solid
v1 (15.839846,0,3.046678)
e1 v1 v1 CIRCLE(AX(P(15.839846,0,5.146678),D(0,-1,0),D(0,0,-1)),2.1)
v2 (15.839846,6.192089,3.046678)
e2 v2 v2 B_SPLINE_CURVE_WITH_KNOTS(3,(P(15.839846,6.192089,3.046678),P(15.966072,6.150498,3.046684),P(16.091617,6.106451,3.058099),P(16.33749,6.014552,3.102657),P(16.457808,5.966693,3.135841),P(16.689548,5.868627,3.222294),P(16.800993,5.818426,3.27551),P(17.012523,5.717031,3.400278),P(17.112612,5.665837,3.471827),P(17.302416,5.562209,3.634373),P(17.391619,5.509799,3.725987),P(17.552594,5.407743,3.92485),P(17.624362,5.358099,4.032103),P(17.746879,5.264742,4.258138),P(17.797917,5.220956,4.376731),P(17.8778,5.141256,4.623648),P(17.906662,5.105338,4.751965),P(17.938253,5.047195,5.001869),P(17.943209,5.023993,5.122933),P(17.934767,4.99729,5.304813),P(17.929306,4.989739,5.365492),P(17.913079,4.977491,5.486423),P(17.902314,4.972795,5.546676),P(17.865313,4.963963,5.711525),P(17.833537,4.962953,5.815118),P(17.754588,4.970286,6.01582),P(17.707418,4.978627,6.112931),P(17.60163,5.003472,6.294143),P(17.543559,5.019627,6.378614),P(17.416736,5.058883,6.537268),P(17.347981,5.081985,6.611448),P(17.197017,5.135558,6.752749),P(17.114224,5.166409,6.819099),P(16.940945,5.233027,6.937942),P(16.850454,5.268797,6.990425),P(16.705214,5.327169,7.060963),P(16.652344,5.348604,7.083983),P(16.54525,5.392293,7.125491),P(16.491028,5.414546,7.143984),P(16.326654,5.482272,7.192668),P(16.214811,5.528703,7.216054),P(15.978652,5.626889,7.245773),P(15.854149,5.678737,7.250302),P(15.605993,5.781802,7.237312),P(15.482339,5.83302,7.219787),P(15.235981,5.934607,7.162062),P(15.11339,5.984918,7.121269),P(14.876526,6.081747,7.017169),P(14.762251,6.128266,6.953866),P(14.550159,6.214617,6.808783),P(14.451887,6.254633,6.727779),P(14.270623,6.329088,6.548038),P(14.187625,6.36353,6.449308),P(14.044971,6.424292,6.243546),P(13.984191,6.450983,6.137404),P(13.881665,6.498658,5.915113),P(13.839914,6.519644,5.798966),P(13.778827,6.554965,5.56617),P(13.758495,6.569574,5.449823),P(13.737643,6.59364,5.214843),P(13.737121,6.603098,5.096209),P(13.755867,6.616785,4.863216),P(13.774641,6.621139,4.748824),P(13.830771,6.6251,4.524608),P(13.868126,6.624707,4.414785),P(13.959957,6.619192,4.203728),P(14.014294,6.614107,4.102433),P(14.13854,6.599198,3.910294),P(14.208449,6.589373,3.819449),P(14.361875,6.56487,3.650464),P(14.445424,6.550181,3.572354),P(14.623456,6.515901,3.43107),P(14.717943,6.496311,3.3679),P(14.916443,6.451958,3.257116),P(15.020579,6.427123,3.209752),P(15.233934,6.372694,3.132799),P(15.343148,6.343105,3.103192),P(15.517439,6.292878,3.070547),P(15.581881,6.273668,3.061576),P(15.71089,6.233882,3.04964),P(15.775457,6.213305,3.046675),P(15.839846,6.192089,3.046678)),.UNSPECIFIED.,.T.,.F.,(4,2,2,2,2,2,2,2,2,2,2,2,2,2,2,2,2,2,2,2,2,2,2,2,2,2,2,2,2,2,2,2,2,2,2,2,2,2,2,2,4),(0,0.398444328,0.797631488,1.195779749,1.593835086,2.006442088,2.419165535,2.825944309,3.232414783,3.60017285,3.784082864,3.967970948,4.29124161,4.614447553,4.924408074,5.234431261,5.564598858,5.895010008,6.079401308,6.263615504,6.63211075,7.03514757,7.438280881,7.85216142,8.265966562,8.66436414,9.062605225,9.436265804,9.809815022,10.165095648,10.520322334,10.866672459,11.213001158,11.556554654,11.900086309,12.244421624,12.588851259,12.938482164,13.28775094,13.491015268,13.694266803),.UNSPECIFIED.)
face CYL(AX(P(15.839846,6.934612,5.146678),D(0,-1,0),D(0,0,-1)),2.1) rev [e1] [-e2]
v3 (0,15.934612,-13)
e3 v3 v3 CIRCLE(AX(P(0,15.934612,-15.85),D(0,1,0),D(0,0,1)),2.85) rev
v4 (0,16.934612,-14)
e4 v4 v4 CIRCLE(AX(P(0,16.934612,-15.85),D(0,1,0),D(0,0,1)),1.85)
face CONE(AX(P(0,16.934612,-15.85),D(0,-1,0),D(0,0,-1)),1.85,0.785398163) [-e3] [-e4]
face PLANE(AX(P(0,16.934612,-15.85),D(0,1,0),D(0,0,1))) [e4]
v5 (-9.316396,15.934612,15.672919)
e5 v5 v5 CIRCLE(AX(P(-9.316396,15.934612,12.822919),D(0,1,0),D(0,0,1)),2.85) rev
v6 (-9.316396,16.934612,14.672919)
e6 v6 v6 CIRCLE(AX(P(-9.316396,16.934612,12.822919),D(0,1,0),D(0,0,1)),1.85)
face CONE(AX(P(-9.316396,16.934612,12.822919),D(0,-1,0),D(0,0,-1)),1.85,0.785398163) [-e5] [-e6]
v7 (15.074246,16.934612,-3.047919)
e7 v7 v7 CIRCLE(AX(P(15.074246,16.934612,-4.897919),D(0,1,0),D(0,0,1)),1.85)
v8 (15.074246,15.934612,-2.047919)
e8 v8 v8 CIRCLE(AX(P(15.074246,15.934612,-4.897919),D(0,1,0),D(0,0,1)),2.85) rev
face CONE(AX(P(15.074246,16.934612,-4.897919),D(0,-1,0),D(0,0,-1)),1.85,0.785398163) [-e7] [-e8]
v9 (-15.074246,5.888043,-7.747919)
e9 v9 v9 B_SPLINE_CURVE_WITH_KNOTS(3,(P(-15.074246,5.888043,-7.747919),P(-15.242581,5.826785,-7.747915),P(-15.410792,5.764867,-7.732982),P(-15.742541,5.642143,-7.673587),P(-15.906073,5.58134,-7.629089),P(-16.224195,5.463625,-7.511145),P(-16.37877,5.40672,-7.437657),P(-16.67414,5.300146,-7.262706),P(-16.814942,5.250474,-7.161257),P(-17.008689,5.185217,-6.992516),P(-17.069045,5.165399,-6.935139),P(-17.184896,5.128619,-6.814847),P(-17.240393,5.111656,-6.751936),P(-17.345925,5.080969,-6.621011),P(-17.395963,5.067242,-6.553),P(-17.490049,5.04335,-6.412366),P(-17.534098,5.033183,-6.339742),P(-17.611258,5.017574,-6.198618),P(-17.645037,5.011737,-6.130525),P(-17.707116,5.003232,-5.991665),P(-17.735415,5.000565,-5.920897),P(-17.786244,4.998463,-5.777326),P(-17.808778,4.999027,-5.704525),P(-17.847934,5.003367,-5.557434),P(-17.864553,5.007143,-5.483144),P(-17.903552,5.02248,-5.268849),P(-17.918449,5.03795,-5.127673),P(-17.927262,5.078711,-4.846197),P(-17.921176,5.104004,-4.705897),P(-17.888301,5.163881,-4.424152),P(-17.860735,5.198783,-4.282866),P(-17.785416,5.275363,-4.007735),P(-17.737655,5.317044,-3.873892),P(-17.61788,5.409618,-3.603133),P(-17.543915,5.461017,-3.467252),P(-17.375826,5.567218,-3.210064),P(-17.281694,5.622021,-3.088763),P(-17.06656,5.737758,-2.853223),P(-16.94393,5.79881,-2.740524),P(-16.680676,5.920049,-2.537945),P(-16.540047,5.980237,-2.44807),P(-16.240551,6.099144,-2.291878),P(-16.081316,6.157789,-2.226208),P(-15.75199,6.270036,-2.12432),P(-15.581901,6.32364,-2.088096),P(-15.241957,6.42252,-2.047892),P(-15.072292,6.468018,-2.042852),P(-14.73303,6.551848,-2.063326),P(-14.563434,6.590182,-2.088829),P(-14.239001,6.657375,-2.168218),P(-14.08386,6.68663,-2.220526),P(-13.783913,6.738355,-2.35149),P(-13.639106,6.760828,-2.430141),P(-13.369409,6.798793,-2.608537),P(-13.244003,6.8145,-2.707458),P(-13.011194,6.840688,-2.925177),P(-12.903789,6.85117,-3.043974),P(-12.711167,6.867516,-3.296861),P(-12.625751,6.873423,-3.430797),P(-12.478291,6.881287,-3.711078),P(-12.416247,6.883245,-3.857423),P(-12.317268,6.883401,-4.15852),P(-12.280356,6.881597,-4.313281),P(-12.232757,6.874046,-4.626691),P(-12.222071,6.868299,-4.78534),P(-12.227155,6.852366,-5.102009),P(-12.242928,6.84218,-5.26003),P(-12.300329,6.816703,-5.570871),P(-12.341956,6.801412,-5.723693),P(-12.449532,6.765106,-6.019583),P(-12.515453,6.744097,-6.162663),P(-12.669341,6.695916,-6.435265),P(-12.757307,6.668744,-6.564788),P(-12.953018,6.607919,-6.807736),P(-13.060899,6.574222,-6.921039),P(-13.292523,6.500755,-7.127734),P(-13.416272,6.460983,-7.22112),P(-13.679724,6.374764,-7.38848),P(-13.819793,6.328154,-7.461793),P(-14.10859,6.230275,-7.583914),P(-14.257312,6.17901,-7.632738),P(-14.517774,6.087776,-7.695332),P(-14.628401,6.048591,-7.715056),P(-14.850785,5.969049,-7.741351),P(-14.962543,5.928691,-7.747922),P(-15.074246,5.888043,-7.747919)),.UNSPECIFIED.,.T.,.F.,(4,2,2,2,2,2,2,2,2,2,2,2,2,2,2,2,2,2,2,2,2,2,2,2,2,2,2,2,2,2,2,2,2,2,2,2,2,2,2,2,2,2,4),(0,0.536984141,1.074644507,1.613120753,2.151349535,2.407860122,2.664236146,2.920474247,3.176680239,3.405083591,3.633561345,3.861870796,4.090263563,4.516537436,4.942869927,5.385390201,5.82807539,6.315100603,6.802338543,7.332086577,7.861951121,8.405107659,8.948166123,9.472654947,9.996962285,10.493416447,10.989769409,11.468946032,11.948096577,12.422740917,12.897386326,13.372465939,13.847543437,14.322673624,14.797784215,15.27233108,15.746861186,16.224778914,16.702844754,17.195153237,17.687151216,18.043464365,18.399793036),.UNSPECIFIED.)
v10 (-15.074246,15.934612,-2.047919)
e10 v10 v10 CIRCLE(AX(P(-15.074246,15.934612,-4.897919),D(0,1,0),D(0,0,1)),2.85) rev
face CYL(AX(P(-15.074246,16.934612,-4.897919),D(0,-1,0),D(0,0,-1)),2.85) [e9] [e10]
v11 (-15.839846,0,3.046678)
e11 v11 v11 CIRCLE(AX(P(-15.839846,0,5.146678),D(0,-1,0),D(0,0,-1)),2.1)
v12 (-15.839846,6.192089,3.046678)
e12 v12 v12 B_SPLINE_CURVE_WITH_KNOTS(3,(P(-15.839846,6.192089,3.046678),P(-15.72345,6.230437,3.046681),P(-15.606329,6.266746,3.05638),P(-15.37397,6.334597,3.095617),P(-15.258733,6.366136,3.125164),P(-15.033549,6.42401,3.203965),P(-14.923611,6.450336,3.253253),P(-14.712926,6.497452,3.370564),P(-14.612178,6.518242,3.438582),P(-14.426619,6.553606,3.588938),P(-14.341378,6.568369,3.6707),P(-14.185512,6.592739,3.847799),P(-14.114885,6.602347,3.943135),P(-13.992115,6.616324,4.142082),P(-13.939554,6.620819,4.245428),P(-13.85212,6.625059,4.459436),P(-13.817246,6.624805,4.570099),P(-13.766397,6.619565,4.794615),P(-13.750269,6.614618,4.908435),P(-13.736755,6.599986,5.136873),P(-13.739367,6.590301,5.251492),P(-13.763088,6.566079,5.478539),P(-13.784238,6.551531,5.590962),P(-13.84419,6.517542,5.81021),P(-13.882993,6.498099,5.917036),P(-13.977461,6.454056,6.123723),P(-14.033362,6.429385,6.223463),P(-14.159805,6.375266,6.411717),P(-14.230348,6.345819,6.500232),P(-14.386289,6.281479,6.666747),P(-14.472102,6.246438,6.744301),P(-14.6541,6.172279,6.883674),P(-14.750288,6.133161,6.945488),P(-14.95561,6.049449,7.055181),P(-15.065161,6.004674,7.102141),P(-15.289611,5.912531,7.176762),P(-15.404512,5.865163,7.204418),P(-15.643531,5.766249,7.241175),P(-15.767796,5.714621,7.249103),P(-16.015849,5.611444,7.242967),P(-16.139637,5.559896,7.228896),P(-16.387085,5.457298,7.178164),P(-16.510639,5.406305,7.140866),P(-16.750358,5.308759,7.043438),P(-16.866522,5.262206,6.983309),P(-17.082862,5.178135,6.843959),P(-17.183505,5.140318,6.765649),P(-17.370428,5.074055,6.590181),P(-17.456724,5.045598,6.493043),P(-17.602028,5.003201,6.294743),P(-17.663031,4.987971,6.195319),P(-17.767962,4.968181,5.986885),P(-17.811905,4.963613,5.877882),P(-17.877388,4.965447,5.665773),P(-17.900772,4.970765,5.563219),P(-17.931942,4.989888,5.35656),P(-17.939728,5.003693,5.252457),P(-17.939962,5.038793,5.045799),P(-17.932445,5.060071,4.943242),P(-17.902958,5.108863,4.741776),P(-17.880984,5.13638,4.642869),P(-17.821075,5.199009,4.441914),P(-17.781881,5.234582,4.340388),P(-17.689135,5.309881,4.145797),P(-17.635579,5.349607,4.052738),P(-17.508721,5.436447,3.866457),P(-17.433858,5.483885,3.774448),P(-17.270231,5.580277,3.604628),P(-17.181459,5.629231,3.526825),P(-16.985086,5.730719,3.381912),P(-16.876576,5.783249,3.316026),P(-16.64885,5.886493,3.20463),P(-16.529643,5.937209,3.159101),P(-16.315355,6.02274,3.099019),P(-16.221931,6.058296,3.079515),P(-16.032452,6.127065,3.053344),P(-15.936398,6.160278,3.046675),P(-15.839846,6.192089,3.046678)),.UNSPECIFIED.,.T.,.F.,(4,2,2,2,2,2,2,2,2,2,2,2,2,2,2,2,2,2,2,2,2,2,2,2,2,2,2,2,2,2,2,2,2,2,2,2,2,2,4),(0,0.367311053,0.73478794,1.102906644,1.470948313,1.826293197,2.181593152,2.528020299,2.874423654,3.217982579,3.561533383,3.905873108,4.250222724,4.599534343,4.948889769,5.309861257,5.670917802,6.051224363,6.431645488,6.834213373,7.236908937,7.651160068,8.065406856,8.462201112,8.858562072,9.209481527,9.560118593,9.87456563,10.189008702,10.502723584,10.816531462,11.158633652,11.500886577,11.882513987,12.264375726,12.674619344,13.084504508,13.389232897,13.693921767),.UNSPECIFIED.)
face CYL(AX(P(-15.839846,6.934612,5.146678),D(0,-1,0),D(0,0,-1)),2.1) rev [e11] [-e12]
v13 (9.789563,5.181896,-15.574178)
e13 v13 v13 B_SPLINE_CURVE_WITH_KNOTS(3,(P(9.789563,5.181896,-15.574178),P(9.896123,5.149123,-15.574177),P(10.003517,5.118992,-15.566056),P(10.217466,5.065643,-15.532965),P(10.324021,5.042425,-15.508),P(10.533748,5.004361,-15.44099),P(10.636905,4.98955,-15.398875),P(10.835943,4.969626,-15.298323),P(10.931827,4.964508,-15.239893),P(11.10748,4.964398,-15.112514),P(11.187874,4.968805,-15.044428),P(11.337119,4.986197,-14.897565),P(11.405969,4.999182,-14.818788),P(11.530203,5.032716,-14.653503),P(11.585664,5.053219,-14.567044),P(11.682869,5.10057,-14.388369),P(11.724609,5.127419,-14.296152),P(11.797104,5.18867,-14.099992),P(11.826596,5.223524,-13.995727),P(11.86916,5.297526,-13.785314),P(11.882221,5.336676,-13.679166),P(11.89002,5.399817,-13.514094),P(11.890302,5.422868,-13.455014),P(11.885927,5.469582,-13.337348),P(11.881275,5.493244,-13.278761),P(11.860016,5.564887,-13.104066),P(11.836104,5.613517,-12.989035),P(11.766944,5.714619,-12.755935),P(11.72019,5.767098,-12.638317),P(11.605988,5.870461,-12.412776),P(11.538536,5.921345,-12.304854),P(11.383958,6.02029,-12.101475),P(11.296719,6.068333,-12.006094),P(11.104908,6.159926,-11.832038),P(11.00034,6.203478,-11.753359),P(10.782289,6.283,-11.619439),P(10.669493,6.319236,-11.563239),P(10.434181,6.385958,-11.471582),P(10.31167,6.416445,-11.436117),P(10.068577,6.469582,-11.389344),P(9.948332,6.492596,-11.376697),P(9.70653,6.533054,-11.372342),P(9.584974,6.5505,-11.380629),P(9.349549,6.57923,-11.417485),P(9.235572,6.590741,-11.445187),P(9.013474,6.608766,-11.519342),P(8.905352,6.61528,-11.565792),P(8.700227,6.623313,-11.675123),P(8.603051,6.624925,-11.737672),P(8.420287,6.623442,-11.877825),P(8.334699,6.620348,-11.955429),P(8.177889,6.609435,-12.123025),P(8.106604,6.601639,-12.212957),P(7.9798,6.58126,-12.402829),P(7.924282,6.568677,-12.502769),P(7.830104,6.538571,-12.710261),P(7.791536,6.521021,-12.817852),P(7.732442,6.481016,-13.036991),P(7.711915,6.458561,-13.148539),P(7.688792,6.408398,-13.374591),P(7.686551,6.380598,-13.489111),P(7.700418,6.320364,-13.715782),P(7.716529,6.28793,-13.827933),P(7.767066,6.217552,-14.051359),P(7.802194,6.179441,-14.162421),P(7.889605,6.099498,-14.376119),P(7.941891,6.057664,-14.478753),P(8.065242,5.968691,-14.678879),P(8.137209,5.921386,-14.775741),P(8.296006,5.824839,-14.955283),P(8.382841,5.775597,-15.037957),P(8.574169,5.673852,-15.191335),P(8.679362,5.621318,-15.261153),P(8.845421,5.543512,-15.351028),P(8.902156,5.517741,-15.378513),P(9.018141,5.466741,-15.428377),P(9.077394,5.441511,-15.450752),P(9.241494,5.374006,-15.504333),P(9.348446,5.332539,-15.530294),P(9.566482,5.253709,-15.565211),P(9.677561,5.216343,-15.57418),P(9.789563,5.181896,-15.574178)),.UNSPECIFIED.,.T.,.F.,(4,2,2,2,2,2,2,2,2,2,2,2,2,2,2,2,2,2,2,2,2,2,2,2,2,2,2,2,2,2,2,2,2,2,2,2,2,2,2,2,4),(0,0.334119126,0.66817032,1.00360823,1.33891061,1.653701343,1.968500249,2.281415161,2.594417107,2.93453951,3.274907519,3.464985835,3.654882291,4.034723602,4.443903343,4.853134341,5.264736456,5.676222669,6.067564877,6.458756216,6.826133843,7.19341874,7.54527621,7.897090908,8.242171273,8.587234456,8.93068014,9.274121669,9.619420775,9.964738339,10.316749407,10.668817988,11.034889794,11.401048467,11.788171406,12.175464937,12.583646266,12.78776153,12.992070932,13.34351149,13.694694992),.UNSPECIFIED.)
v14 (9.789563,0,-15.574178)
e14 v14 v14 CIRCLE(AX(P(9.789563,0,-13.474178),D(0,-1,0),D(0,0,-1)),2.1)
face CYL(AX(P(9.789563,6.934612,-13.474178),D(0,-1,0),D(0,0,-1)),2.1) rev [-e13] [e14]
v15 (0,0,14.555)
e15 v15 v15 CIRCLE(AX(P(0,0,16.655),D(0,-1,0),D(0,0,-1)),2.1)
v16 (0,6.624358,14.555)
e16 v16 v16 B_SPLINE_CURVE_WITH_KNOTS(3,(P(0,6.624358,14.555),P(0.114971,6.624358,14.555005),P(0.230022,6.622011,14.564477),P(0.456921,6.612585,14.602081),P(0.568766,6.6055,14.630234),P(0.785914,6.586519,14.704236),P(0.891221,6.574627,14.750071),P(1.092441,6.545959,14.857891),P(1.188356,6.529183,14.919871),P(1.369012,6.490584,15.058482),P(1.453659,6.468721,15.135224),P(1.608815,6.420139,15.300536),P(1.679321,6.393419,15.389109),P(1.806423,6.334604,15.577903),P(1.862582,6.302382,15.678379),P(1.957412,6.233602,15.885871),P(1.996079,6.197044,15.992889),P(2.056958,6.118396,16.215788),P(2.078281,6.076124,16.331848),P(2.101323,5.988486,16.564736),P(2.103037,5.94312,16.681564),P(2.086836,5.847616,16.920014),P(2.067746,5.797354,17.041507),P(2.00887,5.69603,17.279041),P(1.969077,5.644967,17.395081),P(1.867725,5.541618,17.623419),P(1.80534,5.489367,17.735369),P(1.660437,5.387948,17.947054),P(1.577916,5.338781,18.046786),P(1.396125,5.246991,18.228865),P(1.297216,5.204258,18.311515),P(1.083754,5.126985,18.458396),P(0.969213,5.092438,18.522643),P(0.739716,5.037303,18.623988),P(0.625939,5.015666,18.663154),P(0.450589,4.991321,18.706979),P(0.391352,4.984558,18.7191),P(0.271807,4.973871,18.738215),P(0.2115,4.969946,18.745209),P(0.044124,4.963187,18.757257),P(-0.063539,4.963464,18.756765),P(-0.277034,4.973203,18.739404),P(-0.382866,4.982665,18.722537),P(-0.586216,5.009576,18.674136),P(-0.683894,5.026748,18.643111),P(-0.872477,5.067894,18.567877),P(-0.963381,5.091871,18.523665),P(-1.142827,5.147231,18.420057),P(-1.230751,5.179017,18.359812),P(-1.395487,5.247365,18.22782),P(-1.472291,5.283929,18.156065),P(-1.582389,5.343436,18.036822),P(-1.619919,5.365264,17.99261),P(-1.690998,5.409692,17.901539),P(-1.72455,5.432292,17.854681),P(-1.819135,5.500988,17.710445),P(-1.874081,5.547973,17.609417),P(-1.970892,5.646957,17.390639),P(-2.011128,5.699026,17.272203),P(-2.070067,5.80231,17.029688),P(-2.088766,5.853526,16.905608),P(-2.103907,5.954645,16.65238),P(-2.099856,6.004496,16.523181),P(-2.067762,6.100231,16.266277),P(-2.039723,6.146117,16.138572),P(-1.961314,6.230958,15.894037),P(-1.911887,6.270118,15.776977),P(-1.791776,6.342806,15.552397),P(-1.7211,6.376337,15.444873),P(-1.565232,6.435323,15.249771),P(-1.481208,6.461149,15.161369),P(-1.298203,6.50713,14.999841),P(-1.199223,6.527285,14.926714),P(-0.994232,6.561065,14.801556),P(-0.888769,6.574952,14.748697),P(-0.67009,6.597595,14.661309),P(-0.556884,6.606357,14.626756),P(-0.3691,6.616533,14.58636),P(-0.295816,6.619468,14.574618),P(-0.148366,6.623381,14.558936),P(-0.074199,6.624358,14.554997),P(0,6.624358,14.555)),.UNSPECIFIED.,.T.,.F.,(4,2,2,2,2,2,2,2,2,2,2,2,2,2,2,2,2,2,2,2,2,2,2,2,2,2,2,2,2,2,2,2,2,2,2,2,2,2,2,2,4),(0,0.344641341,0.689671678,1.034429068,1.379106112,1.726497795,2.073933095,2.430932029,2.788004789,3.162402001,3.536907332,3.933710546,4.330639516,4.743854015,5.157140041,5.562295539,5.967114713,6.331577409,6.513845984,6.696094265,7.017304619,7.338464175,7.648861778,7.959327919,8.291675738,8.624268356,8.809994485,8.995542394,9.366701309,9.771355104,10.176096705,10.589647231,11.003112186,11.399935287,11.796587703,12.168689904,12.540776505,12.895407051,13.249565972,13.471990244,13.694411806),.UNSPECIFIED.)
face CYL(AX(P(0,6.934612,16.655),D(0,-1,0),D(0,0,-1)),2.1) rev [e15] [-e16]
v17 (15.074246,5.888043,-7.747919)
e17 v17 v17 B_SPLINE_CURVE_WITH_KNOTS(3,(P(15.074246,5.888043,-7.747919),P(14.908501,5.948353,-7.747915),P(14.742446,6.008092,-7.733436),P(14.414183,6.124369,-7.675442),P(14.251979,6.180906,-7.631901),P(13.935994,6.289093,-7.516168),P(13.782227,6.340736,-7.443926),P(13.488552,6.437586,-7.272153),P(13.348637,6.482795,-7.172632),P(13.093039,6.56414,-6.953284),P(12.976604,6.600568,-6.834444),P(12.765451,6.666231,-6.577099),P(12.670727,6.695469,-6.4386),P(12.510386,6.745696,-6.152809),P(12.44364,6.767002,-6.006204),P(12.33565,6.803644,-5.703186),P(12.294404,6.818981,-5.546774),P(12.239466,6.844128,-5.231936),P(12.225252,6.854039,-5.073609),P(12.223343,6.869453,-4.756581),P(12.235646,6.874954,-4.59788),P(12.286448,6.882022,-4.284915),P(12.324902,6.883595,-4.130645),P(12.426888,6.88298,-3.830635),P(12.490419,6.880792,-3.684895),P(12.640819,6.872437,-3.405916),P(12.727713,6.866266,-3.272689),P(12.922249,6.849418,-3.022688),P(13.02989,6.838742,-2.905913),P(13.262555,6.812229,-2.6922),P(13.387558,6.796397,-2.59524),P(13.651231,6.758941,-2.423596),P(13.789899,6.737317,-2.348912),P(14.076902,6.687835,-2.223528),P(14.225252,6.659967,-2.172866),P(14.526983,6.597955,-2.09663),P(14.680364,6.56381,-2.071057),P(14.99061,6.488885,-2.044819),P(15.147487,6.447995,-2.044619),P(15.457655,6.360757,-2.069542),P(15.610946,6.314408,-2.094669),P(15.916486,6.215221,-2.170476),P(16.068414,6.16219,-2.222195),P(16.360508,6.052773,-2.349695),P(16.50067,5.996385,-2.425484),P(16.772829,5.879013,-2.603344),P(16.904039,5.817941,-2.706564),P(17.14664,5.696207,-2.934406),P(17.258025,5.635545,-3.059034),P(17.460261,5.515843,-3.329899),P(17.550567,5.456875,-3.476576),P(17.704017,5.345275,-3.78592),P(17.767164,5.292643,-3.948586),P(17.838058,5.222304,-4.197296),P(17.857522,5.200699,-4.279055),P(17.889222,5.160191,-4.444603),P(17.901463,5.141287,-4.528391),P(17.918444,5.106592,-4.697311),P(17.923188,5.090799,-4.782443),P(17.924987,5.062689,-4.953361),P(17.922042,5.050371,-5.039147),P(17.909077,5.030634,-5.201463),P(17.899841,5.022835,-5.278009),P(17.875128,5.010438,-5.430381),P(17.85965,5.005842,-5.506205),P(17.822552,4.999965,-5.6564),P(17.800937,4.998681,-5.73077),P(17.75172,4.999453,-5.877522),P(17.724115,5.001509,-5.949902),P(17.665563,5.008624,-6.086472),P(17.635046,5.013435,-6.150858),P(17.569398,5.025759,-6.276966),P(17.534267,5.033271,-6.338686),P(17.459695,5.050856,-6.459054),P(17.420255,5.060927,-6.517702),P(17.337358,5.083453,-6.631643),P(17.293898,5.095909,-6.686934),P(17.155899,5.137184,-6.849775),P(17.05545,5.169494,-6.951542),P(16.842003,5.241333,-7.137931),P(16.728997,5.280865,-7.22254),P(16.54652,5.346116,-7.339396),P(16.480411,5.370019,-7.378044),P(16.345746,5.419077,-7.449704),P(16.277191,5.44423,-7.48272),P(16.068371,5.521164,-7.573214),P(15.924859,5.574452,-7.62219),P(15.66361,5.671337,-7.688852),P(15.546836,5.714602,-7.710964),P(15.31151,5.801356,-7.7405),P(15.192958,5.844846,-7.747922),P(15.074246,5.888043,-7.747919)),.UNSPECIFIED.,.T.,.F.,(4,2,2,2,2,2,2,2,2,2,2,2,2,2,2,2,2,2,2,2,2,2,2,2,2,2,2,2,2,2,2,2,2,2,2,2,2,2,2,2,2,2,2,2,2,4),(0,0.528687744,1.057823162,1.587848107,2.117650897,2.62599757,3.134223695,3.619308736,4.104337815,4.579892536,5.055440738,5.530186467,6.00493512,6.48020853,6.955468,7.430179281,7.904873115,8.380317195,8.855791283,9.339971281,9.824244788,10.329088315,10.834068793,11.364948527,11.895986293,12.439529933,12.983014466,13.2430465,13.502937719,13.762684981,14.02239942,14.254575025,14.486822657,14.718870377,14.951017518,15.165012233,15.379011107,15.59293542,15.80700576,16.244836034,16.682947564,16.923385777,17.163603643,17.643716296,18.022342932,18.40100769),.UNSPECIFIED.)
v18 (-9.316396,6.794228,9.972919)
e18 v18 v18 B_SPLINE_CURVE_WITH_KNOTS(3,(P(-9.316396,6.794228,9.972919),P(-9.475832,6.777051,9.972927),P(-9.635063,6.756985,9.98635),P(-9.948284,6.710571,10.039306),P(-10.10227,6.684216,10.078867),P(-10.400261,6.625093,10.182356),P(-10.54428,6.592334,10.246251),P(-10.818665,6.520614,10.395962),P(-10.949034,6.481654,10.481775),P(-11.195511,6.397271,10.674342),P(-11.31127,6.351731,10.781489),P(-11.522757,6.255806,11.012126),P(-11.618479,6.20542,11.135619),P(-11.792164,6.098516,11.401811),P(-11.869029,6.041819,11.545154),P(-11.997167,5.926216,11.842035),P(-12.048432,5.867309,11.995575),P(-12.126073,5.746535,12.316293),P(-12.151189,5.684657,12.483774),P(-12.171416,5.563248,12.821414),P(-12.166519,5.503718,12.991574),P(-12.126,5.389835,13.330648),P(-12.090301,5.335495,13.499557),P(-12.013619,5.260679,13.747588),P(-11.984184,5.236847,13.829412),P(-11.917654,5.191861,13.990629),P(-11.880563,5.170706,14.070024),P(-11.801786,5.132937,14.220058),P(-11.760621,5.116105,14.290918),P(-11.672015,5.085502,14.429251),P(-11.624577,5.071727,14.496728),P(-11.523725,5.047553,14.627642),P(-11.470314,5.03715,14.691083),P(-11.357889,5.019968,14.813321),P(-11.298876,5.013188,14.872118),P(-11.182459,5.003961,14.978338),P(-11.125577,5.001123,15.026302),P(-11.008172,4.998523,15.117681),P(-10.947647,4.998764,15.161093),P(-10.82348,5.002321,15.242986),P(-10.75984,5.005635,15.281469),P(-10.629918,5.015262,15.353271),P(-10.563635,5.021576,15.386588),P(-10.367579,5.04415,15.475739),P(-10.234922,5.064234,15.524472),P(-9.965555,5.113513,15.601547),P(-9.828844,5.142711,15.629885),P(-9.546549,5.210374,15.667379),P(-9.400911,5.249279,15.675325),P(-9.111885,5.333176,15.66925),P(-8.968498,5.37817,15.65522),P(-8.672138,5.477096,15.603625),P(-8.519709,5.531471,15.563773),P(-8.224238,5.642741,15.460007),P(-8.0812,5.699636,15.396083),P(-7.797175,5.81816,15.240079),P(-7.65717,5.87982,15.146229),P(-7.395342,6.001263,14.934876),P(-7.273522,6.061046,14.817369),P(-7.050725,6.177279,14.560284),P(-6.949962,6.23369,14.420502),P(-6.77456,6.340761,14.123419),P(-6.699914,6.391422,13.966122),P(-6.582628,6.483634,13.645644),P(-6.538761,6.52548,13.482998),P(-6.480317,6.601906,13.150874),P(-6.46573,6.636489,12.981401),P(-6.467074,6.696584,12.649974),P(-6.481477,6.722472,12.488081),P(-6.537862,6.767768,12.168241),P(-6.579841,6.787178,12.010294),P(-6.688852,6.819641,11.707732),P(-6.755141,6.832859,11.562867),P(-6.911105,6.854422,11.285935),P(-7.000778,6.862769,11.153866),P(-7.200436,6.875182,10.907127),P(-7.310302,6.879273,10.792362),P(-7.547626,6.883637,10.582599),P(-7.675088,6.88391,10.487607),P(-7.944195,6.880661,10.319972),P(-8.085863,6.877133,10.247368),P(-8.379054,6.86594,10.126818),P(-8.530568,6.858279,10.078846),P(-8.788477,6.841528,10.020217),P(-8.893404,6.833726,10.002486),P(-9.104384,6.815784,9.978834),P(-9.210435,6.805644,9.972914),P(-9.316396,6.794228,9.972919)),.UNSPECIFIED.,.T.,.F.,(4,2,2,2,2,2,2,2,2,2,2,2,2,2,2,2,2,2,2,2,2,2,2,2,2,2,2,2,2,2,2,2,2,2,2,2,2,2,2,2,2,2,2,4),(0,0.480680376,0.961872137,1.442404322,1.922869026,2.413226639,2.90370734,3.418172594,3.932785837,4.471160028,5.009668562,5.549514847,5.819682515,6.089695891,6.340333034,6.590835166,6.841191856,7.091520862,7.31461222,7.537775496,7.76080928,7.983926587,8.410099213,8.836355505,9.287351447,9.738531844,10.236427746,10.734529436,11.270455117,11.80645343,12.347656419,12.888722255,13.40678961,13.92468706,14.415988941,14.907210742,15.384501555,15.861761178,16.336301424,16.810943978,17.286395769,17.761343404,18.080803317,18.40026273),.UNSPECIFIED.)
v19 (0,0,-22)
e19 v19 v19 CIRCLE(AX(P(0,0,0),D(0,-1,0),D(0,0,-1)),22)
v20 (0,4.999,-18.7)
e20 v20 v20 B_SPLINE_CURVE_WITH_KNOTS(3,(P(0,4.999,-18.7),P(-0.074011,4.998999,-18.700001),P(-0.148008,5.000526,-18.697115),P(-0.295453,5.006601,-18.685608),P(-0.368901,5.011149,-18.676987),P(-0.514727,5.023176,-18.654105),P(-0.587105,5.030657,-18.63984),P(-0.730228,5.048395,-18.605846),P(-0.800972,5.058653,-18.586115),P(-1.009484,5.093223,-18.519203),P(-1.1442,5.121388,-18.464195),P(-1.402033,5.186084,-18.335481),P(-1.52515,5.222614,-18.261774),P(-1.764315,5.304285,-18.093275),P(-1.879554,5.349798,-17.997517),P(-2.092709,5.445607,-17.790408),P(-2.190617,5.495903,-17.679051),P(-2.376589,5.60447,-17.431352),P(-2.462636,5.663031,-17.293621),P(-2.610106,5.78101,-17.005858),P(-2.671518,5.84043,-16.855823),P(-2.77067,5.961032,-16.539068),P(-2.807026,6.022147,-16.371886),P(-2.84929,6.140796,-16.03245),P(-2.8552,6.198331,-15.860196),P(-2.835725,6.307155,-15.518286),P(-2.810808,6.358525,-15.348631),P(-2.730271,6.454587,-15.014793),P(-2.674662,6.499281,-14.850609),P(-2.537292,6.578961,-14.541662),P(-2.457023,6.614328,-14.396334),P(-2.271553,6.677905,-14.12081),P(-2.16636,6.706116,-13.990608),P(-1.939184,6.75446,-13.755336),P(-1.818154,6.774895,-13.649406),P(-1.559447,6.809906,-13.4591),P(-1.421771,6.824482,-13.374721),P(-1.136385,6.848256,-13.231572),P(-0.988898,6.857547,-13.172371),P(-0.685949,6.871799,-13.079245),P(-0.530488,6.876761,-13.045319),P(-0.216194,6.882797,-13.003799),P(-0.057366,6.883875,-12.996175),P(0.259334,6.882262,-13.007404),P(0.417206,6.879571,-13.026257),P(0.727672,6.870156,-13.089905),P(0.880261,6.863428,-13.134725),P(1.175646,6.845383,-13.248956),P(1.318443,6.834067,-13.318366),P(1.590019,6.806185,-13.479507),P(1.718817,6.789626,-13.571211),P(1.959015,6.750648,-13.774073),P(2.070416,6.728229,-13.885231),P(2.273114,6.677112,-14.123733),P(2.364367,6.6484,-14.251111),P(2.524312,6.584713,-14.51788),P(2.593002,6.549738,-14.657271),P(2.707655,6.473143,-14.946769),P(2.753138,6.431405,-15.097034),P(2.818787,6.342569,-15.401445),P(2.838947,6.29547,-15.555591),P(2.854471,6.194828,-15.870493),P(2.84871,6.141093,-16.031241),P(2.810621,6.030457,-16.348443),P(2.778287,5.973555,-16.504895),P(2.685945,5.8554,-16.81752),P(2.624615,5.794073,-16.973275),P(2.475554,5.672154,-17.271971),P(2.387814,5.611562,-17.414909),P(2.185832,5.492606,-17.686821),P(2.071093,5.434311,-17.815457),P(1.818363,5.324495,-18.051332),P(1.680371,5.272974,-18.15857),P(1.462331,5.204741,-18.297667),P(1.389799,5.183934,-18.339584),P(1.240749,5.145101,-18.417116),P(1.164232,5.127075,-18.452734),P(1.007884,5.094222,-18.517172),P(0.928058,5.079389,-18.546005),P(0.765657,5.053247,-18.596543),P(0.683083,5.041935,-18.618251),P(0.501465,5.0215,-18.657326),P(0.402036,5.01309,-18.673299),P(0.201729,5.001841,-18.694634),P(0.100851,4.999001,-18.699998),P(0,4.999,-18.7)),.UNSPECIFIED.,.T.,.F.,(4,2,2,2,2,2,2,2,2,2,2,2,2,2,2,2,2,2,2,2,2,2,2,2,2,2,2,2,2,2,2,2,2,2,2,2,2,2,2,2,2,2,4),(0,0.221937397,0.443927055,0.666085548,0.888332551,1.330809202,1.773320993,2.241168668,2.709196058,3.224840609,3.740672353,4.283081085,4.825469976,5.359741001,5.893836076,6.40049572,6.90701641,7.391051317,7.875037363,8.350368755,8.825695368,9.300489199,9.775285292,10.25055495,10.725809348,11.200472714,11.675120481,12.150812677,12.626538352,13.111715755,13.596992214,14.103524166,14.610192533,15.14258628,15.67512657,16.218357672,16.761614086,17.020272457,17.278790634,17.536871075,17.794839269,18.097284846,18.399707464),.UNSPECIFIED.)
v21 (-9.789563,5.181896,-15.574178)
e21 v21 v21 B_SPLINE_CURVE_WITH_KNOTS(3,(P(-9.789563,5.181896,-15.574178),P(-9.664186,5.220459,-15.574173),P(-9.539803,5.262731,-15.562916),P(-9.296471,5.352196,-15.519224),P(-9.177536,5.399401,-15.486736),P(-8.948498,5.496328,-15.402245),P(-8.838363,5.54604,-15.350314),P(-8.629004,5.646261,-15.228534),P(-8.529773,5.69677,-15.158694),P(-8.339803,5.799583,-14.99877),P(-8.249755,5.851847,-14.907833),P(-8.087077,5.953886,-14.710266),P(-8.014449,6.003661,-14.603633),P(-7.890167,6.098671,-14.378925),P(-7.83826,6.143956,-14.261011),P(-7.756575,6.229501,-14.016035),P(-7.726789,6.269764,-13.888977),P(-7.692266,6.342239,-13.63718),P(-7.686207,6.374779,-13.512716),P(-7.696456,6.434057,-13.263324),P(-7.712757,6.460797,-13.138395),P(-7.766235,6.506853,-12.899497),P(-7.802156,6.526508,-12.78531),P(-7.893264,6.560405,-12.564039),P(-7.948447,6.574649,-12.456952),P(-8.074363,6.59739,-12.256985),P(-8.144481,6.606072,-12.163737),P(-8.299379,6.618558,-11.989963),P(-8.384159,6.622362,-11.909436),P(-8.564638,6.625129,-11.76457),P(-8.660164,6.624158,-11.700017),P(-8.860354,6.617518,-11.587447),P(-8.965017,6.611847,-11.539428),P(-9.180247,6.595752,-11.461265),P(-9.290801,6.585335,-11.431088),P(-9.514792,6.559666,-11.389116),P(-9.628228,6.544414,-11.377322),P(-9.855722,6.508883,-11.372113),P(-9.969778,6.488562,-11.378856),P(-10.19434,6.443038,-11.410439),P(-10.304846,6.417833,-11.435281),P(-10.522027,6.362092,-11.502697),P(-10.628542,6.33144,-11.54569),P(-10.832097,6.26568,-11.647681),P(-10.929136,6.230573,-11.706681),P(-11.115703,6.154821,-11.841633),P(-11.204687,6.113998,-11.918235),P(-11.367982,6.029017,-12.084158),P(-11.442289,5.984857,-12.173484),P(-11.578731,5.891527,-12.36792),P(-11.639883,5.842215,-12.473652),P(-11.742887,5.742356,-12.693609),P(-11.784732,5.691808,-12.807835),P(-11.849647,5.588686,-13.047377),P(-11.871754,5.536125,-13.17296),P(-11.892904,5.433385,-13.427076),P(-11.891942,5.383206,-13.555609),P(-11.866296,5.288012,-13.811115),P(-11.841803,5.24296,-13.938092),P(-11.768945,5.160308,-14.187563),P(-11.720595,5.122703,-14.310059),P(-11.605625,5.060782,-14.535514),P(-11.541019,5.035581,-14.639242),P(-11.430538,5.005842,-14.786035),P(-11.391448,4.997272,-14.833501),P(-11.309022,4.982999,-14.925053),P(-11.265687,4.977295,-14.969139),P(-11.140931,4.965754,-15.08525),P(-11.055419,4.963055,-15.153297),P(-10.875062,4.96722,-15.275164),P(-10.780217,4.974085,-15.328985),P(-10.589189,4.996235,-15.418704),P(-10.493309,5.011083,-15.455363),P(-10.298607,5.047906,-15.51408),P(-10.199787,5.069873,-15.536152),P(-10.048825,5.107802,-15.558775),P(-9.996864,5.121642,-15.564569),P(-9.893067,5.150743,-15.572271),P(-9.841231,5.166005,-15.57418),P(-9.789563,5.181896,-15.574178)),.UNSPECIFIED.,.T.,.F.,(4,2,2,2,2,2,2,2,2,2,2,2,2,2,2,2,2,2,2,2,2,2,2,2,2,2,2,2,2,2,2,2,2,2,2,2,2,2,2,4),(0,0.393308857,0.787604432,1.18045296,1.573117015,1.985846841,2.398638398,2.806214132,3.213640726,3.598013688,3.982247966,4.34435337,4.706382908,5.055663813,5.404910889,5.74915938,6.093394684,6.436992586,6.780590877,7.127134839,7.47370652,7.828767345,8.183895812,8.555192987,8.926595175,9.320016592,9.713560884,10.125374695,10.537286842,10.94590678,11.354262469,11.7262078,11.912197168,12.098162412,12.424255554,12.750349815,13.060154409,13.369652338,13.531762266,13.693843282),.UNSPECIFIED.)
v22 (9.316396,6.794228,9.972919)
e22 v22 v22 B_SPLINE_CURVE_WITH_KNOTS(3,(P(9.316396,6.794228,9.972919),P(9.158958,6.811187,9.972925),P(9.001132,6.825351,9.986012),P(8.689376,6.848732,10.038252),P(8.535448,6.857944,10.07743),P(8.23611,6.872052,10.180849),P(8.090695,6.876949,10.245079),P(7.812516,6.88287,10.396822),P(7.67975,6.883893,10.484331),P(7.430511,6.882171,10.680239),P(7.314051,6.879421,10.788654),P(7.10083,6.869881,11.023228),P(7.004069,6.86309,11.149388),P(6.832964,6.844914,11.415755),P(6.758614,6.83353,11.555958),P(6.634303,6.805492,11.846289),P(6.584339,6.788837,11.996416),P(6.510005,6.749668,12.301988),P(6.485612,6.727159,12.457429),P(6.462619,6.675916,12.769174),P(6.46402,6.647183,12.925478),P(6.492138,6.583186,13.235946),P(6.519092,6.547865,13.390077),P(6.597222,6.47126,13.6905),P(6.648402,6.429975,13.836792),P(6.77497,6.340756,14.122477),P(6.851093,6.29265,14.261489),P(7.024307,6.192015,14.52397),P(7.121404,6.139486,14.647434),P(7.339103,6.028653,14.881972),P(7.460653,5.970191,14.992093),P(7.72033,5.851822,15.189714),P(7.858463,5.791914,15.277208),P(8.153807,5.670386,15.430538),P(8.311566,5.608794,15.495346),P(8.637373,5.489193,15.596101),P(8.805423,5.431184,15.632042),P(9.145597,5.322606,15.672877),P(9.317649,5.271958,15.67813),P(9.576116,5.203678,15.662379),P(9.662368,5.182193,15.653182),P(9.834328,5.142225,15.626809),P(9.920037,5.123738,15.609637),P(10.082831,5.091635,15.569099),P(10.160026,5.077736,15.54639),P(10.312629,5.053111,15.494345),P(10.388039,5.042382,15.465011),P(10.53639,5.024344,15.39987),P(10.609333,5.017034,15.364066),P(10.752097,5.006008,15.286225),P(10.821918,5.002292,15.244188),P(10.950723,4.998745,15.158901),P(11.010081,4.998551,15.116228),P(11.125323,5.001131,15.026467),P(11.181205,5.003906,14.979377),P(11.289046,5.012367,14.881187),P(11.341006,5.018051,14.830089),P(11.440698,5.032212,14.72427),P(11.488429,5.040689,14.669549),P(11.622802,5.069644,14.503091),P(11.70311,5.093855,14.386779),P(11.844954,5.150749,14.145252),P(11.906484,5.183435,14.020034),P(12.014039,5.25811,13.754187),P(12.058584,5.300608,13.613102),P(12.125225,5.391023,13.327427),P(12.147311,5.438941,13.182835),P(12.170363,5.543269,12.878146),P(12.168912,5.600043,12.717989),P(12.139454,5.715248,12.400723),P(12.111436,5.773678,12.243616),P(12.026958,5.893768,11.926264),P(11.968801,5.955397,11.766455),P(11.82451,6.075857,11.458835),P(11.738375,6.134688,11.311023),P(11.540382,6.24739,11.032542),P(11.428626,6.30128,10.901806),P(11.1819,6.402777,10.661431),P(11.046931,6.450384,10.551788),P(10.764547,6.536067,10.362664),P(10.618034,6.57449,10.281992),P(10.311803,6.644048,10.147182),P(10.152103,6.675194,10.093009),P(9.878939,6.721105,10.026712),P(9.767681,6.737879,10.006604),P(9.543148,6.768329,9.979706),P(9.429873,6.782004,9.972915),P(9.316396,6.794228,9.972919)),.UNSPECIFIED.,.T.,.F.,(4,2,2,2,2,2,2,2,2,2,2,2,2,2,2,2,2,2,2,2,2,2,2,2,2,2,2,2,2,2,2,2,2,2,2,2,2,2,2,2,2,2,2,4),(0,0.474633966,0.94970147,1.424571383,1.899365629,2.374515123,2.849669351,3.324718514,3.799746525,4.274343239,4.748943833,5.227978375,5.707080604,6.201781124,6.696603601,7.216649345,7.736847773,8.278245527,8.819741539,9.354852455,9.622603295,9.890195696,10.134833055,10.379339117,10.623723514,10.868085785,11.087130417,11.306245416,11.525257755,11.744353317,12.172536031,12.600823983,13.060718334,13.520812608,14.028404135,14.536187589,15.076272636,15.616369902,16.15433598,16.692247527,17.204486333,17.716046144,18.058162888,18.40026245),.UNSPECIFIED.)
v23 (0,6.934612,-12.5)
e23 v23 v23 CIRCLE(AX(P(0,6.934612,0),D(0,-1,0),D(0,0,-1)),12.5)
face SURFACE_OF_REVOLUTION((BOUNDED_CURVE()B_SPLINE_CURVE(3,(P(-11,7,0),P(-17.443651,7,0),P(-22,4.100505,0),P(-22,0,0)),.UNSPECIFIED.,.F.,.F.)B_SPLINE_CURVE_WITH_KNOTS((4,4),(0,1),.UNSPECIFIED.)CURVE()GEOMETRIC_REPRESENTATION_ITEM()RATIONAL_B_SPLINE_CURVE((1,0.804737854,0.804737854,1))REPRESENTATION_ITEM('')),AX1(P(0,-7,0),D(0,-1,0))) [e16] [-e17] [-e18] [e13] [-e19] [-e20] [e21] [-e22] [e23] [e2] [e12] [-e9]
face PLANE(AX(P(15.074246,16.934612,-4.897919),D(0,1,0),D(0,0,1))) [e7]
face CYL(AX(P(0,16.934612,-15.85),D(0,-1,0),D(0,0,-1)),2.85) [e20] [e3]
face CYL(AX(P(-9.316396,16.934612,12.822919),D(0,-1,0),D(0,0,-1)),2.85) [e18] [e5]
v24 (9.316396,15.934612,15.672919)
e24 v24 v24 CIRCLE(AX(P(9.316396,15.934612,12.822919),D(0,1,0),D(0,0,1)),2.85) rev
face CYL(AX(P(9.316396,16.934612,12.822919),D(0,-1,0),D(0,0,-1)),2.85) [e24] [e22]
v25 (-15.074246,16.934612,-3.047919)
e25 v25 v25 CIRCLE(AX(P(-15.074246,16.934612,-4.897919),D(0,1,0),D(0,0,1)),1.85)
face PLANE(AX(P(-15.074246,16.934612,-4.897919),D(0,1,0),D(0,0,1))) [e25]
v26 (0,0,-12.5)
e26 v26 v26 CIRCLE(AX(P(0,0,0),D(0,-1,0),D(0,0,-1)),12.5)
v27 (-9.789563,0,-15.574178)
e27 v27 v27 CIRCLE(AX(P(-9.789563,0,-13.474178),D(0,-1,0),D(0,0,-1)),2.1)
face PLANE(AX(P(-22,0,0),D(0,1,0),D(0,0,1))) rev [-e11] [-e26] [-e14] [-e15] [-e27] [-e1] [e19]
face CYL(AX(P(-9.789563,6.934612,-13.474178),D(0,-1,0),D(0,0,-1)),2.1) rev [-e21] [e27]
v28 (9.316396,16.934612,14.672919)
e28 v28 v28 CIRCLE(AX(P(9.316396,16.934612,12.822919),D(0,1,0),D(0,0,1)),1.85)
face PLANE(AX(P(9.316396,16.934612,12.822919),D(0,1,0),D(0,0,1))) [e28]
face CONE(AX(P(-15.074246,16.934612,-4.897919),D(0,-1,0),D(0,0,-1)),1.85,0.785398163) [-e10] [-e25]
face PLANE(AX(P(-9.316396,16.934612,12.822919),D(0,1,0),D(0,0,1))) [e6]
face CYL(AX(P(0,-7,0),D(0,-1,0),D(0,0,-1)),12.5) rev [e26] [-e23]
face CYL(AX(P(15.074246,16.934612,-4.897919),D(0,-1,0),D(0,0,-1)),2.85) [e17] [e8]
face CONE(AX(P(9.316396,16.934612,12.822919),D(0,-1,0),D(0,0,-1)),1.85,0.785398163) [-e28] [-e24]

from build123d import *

# Parameters (mm, degrees)
SKIZZE10_R                      = 2.1
SCHNITT_LINEAR_AUSTRAGEN2_DEPTH = 32.876148669
AUFSATZ_LINEAR_START            = -16.934612
SKIZZE11_R                      = 2.85
AUFSATZ_LINEAR_AUSTRAGEN2_DEPTH = 16.934612
FASE2_SIZE                      = 1


with BuildPart() as part:
    # Skizze9 → Rotation3 (revolve)
    with BuildSketch(Plane.XY, mode=Mode.PRIVATE) as rotation3_sk:
        with BuildLine():
            Line((-22.535926767, 1.075405754), (-13.035926767, 1.075405754))
            Line((-13.035926767, 1.075405754), (-13.035926767, 8.010017709))
            add(Edge.make_bspline(
                [(-13.035926767, 8.010017709), (-18.805620772, 7.504620795), (-22.535926767, 4.706629491), (-22.535926767, 1.075405754)],
                knots=[0.094203165, 0.094203165, 0.094203165, 0.094203165, 1, 1, 1, 1], degree=3, weights=[0.950015471, 0.806470657, 0.823132166, 1]))
        make_face()
    revolve(rotation3_sk.sketch.rotate(Axis((-0.535926767, -5.924594246, 0), (0, 1, 0)), 270), axis=Axis((-0.535926767, -5.924594246, 0), (0, 1, 0)))


with BuildPart() as part_1:
    # Körper-Verschieben/Kopieren1: read off the stored shape, not the designer's step
    # Körper-Verschieben/Kopieren1: moved
    add(part.part.moved(Location((0.5359268, -1.0754058, 0))))

    # Skizze10 → Schnitt-Linear austragen2 (cut, through all)
    with BuildSketch(Plane.XZ):
        with Locations(Location((0, 16.655, 0), (0, 0, 270))):
            Circle(SKIZZE10_R)
        with Locations(Location((15.839846279, 5.146678041, 0), (0, 0, 270))):
            Circle(SKIZZE10_R)
        with Locations(Location((9.789563377, -13.474178041, 0), (0, 0, 270))):
            Circle(SKIZZE10_R)
        with Locations(Location((-9.789563377, -13.474178041, 0), (0, 0, 270))):
            Circle(SKIZZE10_R)
        with Locations(Location((-15.839846279, 5.146678041, 0), (0, 0, 270))):
            Circle(SKIZZE10_R)
    extrude(amount=-SCHNITT_LINEAR_AUSTRAGEN2_DEPTH, mode=Mode.SUBTRACT)

    # Skizze11 → Aufsatz-Linear austragen2 (add)
    with BuildSketch(Plane.XZ.offset(AUFSATZ_LINEAR_START)):
        with Locations(Location((-9.316396249, 12.822919361, 0), (0, 0, 270))):
            Circle(SKIZZE11_R)
        with Locations(Location((9.316396249, 12.822919361, 0), (0, 0, 270))):
            Circle(SKIZZE11_R)
        with Locations(Location((15.074245783, -4.897919361, 0), (0, 0, 270))):
            Circle(SKIZZE11_R)
        with Locations(Location((0, -15.85, 0), (0, 0, 90))):
            Circle(SKIZZE11_R)
        with Locations(Location((-15.074245783, -4.897919361, 0), (0, 0, 270))):
            Circle(SKIZZE11_R)
    extrude(amount=AUFSATZ_LINEAR_AUSTRAGEN2_DEPTH)

    # Fase2
    fase2_edges = [part_1.edges().sort_by_distance(p)[0] for p in [
        (-9.316396249, 16.934612, 15.672919361),
        (9.316396249, 16.934612, 15.672919361),
        (15.074245783, 16.934612, -2.047919361),
        (0, 16.934612, -18.7),
        (-15.074245783, 16.934612, -2.047919361),
    ]]
    chamfer(fase2_edges, length=FASE2_SIZE)


solid = part_1.part
